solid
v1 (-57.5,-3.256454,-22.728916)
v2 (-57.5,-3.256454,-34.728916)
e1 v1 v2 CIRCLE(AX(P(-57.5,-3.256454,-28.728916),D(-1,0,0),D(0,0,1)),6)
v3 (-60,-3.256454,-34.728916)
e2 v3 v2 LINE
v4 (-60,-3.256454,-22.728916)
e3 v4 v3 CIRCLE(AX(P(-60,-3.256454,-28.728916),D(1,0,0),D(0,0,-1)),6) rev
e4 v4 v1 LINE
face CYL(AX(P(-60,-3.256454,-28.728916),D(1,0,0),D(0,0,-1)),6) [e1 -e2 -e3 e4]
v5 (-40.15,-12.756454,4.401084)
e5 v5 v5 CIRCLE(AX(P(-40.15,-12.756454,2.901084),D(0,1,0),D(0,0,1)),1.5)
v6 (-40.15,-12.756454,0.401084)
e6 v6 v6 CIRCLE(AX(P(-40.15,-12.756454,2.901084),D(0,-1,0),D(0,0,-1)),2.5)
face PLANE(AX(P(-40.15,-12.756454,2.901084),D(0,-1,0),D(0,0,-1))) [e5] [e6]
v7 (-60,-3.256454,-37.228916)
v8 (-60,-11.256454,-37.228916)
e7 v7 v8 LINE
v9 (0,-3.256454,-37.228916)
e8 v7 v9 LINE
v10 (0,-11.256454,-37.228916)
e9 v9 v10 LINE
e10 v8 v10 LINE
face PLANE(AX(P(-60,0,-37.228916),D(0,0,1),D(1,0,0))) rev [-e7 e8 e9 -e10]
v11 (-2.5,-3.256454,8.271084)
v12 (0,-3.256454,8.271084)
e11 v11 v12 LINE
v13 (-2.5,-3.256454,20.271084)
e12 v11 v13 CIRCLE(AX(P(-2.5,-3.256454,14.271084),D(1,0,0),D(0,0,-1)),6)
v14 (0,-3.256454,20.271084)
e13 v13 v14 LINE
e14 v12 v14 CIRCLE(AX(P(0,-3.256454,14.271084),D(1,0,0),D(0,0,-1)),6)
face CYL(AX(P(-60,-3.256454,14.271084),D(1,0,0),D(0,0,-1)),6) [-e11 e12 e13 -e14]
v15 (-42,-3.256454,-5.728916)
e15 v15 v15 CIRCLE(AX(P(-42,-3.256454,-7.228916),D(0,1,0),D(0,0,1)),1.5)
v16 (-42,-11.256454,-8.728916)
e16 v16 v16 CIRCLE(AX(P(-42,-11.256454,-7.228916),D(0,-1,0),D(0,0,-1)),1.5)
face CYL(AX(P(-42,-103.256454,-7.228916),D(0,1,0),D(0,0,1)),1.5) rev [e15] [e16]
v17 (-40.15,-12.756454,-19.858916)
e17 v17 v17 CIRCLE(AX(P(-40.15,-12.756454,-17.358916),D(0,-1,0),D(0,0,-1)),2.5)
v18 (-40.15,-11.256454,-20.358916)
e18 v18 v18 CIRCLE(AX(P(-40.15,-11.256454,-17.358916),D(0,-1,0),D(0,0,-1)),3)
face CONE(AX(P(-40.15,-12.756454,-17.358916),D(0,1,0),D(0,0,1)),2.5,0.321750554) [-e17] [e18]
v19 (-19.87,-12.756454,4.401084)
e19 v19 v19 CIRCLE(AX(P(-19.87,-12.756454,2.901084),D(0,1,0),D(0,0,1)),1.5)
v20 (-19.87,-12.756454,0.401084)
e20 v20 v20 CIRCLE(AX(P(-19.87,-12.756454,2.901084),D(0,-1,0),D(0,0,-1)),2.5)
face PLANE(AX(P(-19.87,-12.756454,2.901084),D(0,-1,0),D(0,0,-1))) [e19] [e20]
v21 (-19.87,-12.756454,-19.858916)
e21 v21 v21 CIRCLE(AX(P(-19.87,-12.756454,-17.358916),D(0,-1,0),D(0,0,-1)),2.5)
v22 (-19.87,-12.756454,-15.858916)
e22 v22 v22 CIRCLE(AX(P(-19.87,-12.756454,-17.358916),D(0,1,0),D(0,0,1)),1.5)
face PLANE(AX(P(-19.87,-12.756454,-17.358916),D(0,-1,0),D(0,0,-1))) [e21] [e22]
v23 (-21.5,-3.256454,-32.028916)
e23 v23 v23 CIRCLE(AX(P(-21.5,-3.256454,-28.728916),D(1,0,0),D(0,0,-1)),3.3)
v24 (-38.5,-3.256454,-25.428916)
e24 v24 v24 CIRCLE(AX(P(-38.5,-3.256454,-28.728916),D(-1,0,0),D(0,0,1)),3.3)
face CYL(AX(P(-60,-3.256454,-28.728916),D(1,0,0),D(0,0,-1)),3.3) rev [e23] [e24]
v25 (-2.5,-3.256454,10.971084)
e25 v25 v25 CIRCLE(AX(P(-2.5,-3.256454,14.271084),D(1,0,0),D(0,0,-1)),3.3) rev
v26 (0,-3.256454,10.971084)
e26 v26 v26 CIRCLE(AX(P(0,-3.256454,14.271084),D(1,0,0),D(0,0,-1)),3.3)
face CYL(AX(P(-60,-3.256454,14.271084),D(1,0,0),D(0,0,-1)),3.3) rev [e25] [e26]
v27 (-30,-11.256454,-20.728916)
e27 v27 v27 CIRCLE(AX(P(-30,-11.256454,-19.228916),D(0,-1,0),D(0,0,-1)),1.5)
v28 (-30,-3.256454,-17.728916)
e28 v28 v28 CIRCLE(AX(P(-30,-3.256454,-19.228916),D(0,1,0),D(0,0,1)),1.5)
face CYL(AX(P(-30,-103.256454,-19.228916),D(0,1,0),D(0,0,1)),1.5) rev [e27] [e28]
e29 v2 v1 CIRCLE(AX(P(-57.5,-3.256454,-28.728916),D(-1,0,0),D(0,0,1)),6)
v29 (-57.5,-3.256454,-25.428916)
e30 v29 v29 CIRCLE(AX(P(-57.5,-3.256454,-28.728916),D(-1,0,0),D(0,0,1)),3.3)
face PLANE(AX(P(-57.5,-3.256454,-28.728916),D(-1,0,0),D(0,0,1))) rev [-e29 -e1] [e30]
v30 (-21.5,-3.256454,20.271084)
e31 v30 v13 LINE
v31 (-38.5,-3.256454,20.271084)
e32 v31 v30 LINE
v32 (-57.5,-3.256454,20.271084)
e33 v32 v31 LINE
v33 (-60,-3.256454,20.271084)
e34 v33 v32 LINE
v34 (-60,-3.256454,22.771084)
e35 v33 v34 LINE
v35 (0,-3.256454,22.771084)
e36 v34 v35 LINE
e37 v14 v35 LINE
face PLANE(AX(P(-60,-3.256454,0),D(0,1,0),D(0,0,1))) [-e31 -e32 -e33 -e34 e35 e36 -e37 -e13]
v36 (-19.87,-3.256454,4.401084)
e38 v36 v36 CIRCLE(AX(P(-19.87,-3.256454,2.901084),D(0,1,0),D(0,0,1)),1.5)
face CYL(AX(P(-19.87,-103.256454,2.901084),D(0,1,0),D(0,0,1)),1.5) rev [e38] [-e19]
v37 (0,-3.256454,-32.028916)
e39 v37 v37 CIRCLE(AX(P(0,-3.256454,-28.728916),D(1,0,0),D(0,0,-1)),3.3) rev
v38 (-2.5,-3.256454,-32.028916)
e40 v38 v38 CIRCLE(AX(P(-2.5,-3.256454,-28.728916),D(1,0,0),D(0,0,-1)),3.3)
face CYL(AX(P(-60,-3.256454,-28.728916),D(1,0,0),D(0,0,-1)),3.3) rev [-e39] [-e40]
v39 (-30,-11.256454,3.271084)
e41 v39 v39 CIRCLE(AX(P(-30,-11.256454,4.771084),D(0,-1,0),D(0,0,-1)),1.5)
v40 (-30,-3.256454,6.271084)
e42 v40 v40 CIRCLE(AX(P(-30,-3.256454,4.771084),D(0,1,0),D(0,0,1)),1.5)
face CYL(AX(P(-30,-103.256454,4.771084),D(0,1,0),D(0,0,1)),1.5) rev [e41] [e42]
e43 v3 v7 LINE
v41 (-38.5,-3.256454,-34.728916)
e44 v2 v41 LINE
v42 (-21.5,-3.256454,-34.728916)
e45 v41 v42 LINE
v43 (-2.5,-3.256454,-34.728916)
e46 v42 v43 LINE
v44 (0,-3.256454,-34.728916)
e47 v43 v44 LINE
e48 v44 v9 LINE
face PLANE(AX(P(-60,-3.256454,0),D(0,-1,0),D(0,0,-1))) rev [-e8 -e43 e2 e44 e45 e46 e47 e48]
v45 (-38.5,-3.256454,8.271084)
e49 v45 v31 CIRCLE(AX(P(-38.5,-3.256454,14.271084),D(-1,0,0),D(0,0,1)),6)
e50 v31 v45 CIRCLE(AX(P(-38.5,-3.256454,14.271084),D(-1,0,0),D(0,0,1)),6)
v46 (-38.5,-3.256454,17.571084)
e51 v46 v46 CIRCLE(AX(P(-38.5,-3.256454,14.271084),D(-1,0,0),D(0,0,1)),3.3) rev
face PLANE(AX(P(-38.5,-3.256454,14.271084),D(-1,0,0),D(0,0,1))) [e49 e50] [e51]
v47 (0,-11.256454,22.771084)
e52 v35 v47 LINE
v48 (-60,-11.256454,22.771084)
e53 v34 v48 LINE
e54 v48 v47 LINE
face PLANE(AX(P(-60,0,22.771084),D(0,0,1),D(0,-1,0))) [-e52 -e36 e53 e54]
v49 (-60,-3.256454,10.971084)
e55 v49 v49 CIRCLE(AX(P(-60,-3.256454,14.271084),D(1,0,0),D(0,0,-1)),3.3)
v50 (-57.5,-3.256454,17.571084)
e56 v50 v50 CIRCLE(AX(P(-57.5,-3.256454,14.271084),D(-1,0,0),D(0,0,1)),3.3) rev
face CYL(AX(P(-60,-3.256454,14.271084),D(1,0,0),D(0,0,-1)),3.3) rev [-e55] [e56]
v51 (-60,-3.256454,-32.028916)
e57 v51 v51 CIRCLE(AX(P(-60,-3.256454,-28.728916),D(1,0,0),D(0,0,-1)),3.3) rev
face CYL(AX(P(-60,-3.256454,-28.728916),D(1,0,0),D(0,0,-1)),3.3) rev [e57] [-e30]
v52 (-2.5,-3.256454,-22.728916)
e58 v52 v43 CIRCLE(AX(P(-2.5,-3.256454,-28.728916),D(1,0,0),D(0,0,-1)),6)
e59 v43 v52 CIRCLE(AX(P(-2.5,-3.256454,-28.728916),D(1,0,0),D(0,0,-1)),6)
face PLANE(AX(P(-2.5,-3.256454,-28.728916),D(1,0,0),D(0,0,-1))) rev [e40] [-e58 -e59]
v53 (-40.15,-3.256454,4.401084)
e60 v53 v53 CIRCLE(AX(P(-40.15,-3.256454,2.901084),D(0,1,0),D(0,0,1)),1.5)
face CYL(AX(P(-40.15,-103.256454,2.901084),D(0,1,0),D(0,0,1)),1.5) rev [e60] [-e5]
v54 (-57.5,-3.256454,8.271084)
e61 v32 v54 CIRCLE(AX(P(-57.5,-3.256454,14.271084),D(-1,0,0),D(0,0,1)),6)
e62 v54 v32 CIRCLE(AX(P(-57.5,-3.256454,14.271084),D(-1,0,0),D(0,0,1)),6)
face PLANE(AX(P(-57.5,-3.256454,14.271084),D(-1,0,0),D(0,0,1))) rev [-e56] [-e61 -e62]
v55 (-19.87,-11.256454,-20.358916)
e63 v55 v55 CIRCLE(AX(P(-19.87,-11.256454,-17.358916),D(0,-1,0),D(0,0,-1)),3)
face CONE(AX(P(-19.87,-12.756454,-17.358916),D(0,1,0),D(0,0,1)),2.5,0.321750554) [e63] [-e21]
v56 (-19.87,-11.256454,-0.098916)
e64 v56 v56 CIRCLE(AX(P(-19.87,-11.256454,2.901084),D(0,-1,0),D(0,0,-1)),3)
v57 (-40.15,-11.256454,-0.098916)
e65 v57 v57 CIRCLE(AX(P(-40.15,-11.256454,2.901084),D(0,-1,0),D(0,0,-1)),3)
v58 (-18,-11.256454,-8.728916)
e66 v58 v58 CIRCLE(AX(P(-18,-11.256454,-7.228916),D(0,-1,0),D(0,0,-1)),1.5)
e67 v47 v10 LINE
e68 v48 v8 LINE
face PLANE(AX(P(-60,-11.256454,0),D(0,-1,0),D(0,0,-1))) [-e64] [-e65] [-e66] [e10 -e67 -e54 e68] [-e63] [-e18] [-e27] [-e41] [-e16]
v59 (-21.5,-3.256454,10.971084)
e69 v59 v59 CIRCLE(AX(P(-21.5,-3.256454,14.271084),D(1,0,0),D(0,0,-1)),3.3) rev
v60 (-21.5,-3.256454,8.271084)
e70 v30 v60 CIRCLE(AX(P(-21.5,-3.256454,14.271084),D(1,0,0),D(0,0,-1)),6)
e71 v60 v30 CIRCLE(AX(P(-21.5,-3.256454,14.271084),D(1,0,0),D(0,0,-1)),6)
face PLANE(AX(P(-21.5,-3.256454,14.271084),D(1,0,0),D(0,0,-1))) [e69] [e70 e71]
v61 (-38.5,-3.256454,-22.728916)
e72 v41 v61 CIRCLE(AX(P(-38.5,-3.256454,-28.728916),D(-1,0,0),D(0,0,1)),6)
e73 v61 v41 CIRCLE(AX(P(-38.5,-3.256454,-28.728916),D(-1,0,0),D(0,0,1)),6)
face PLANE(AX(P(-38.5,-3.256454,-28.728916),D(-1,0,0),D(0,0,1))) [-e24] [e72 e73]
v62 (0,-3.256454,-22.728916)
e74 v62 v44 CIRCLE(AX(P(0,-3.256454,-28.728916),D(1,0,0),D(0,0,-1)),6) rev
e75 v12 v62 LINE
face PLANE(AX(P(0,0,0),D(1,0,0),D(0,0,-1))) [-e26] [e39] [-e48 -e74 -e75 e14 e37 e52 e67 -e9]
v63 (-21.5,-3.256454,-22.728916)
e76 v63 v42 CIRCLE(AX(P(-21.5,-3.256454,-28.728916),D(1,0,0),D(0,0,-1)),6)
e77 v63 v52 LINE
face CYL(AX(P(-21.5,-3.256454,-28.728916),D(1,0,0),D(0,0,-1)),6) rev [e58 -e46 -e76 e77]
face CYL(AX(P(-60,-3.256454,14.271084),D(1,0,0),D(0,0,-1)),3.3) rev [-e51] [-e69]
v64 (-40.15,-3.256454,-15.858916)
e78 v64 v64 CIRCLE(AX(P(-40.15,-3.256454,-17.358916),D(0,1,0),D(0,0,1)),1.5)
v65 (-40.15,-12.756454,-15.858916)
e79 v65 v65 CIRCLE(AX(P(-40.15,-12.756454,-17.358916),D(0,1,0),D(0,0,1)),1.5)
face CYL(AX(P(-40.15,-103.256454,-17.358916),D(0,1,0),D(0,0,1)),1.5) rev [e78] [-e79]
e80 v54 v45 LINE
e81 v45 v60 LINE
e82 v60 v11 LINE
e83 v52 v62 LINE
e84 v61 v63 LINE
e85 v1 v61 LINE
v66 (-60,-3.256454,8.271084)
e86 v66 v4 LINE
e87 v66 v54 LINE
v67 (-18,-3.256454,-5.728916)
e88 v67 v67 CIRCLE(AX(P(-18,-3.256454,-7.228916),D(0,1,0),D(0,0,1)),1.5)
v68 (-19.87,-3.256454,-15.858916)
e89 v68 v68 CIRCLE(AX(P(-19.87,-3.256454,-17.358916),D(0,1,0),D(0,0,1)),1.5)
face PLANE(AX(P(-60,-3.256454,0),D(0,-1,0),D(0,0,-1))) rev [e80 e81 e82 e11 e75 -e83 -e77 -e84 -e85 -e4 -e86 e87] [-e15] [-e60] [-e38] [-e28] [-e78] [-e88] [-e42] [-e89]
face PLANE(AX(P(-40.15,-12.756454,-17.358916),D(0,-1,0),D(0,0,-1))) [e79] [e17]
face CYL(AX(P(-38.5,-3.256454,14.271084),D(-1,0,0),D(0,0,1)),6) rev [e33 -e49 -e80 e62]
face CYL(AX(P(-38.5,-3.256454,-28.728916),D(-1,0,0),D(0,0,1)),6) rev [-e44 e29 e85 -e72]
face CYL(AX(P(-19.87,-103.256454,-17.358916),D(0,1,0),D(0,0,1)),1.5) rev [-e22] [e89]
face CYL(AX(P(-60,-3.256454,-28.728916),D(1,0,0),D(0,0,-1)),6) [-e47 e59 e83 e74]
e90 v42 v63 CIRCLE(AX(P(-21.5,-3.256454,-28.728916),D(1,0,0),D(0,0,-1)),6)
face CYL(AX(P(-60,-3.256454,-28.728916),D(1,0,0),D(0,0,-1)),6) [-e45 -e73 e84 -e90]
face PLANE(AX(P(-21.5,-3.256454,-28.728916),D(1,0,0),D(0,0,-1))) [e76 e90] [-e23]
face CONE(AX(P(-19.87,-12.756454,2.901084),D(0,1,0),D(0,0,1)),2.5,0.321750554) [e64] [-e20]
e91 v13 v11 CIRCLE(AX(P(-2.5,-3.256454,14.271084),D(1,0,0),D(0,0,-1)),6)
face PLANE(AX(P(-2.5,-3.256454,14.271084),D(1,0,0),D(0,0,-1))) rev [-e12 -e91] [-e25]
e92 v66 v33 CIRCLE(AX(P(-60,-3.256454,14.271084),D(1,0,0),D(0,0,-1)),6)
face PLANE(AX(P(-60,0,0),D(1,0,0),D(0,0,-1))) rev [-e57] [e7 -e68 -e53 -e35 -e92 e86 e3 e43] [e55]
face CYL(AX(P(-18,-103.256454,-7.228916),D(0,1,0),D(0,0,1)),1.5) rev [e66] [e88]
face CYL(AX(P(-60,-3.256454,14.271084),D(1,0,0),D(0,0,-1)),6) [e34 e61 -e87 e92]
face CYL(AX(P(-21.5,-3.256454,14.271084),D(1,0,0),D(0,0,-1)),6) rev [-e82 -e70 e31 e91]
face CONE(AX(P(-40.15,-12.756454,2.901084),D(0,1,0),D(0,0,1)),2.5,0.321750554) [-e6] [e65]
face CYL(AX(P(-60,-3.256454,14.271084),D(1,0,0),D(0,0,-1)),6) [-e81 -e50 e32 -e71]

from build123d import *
from OCP.BRepFilletAPI import BRepFilletAPI_MakeChamfer

# Parameters (mm, degrees)
SKETCH_11_R         = 3.3
EXTRUDE_4_DEPTH     = 60
SKETCH_17_R         = 6
CUT_EXTRUDE_3_DEPTH = 19
SKETCH_18_R         = 6
CUT_EXTRUDE_4_DEPTH = 19
CUT_EXTRUDE_START   = -19
SKETCH_19_R         = 6
CUT_EXTRUDE_5_DEPTH = 19
SKETCH_21_R         = 6
CUT_EXTRUDE_6_DEPTH = 19
SKETCH_22_R         = 1.5
CUT_EXTRUDE_7_DEPTH = 100
SKETCH_28_R         = 3
EXTRUDE_5_DEPTH     = 1.5
CHAMFER_1_SIZE      = 1.5
CHAMFER_1_SIZE_2    = 0.5
SKETCH_29_R         = 1.5
CUT_EXTRUDE_9_DEPTH = 72.986055326


with BuildPart() as part:
    # 草图11 → 凸台-拉伸4 (new body)
    with BuildSketch(Plane(origin=(0, 0, 0), x_dir=(0, 0, -1), z_dir=(1, 0, 0))):
        with BuildLine():
            Line((-22.771084337, -3.256454389), (-22.771084337, -11.256454389))
            Line((-22.771084337, -11.256454389), (37.228915663, -11.256454389))
            Line((37.228915663, -11.256454389), (37.228915663, -3.256454389))
            Line((37.228915663, -3.256454389), (34.728915663, -3.256454389))
            ThreePointArc((34.728915663, -3.256454389), (28.728915663, 2.743545611), (22.728915663, -3.256454389))
            Line((22.728915663, -3.256454389), (-8.271084337, -3.256454389))
            ThreePointArc((-8.271084337, -3.256454389), (-14.271084337, 2.743545611), (-20.271084337, -3.256454389))
            Line((-20.271084337, -3.256454389), (-22.771084337, -3.256454389))
        make_face()
        with Locations((-14.271084337, -3.256454389)):
            Circle(SKETCH_11_R, mode=Mode.SUBTRACT)
        with Locations((28.728915663, -3.256454389)):
            Circle(SKETCH_11_R, mode=Mode.SUBTRACT)
    extrude(amount=-EXTRUDE_4_DEPTH)

    # 草图17 → 切除-拉伸3 (cut)
    with BuildSketch(Plane(origin=(-2.5, 0, 0), x_dir=(0, 0, -1), z_dir=(1, 0, 0))):
        with Locations((-14.271084337, -3.256454389)):
            Circle(SKETCH_17_R)
    extrude(amount=-CUT_EXTRUDE_3_DEPTH, mode=Mode.SUBTRACT)

    # 草图18 → 切除-拉伸4 (cut)
    with BuildSketch(Plane(origin=(-2.5, 0, 0), x_dir=(0, 0, -1), z_dir=(1, 0, 0))):
        with Locations((28.728915663, -3.256454389)):
            Circle(SKETCH_18_R)
    extrude(amount=-CUT_EXTRUDE_4_DEPTH, mode=Mode.SUBTRACT)

    # 草图19 → 切除-拉伸5 (cut)
    with BuildSketch(Plane.ZY.offset(57.5).offset(CUT_EXTRUDE_START)):
        with Locations((-28.728915663, -3.256454389)):
            Circle(SKETCH_19_R)
    extrude(amount=CUT_EXTRUDE_5_DEPTH, mode=Mode.SUBTRACT)

    # 草图21 → 切除-拉伸6 (cut)
    with BuildSketch(Plane.ZY.offset(57.5).offset(CUT_EXTRUDE_START)):
        with Locations((14.271084337, -3.256454389)):
            Circle(SKETCH_21_R)
    extrude(amount=CUT_EXTRUDE_6_DEPTH, mode=Mode.SUBTRACT)

    # 草图22 → 切除-拉伸7 (cut)
    with BuildSketch(Plane(origin=(0, -3.256454389, 0), x_dir=(1, 0, 0), z_dir=(0, 1, 0))):
        with Locations(Location((-30, 19.228915663, 0), (0, 0, 270))):
            Circle(SKETCH_22_R)
        with Locations(Location((-30, -4.771084337, 0), (0, 0, 270))):
            Circle(SKETCH_22_R)
        with Locations(Location((-18, 7.228915663, 0), (0, 0, 270))):
            Circle(SKETCH_22_R)
        with Locations(Location((-42, 7.228915663, 0), (0, 0, 270))):
            Circle(SKETCH_22_R)
        with Locations(Location((-19.87, 17.358915663, 0), (0, 0, 270))):
            Circle(SKETCH_22_R)
        with Locations(Location((-19.87, -2.901084337, 0), (0, 0, 270))):
            Circle(SKETCH_22_R)
        with Locations(Location((-40.15, -2.901084337, 0), (0, 0, 270))):
            Circle(SKETCH_22_R)
        with Locations(Location((-40.15, 17.358915663, 0), (0, 0, 270))):
            Circle(SKETCH_22_R)
    extrude(amount=-CUT_EXTRUDE_7_DEPTH, mode=Mode.SUBTRACT)

    # 草图28 → 凸台-拉伸5 (add)
    with BuildSketch(Plane.XZ.offset(11.256454389)):
        with Locations(Location((-19.87, 2.901084337, 0), (0, 0, 270))):
            Circle(SKETCH_28_R)
        with Locations(Location((-19.87, -17.358915663, 0), (0, 0, 270))):
            Circle(SKETCH_28_R)
        with Locations(Location((-40.15, -17.358915663, 0), (0, 0, 270))):
            Circle(SKETCH_28_R)
        with Locations(Location((-40.15, 2.901084337, 0), (0, 0, 270))):
            Circle(SKETCH_28_R)
    extrude(amount=EXTRUDE_5_DEPTH)

    # 倒角1
    chamfer_1_edges_1 = [part.edges().sort_by_distance(p)[0] for p in [
        (-19.87, -12.756454389, 5.901084337),
    ]]
    chamfer_1_side_1 = [part.faces().sort_by_distance(p)[0] for p in [
        (-19.87, -12.746454389, 5.901084337),
    ]]
    chamfer_1_edges_2 = [part.edges().sort_by_distance(p)[0] for p in [
        (-19.87, -12.756454389, -14.358915663),
    ]]
    chamfer_1_side_2 = [part.faces().sort_by_distance(p)[0] for p in [
        (-19.87, -12.746454389, -14.358915663),
    ]]
    chamfer_1_edges_3 = [part.edges().sort_by_distance(p)[0] for p in [
        (-40.15, -12.756454389, -14.358915663),
    ]]
    chamfer_1_side_3 = [part.faces().sort_by_distance(p)[0] for p in [
        (-40.15, -12.746454389, -14.358915663),
    ]]
    chamfer_1_edges_4 = [part.edges().sort_by_distance(p)[0] for p in [
        (-40.15, -12.756454389, 5.901084337),
    ]]
    chamfer_1_side_4 = [part.faces().sort_by_distance(p)[0] for p in [
        (-40.15, -12.746454389, 5.901084337),
    ]]
    chamfer_1 = BRepFilletAPI_MakeChamfer(part.part.solid().wrapped)
    for e in chamfer_1_edges_1:
        chamfer_1.Add(CHAMFER_1_SIZE - 0.0001, CHAMFER_1_SIZE_2 - 0.0001, e.wrapped, chamfer_1_side_1[0].wrapped)
    for e in chamfer_1_edges_2:
        chamfer_1.Add(CHAMFER_1_SIZE - 0.0001, CHAMFER_1_SIZE_2 - 0.0001, e.wrapped, chamfer_1_side_2[0].wrapped)
    for e in chamfer_1_edges_3:
        chamfer_1.Add(CHAMFER_1_SIZE - 0.0001, CHAMFER_1_SIZE_2 - 0.0001, e.wrapped, chamfer_1_side_3[0].wrapped)
    for e in chamfer_1_edges_4:
        chamfer_1.Add(CHAMFER_1_SIZE - 0.0001, CHAMFER_1_SIZE_2 - 0.0001, e.wrapped, chamfer_1_side_4[0].wrapped)
    add(Compound.cast(chamfer_1.Shape()), mode=Mode.REPLACE)  # a hair under: the kernel refuses the full size

    # 草图29 → 切除-拉伸9 (cut, through all)
    with BuildSketch(Plane(origin=(0, -11.256454389, 0), x_dir=(1, 0, 0), z_dir=(0, 1, 0))):
        with Locations(Location((-40.15, -2.901084337, 0), (0, 0, 270))):
            Circle(SKETCH_29_R)
        with Locations(Location((-40.15, 17.358915663, 0), (0, 0, 270))):
            Circle(SKETCH_29_R)
        with Locations(Location((-19.87, 17.358915663, 0), (0, 0, 270))):
            Circle(SKETCH_29_R)
        with Locations(Location((-19.87, -2.901084337, 0), (0, 0, 270))):
            Circle(SKETCH_29_R)
    extrude(amount=-CUT_EXTRUDE_9_DEPTH, mode=Mode.SUBTRACT)


solid = part.part
